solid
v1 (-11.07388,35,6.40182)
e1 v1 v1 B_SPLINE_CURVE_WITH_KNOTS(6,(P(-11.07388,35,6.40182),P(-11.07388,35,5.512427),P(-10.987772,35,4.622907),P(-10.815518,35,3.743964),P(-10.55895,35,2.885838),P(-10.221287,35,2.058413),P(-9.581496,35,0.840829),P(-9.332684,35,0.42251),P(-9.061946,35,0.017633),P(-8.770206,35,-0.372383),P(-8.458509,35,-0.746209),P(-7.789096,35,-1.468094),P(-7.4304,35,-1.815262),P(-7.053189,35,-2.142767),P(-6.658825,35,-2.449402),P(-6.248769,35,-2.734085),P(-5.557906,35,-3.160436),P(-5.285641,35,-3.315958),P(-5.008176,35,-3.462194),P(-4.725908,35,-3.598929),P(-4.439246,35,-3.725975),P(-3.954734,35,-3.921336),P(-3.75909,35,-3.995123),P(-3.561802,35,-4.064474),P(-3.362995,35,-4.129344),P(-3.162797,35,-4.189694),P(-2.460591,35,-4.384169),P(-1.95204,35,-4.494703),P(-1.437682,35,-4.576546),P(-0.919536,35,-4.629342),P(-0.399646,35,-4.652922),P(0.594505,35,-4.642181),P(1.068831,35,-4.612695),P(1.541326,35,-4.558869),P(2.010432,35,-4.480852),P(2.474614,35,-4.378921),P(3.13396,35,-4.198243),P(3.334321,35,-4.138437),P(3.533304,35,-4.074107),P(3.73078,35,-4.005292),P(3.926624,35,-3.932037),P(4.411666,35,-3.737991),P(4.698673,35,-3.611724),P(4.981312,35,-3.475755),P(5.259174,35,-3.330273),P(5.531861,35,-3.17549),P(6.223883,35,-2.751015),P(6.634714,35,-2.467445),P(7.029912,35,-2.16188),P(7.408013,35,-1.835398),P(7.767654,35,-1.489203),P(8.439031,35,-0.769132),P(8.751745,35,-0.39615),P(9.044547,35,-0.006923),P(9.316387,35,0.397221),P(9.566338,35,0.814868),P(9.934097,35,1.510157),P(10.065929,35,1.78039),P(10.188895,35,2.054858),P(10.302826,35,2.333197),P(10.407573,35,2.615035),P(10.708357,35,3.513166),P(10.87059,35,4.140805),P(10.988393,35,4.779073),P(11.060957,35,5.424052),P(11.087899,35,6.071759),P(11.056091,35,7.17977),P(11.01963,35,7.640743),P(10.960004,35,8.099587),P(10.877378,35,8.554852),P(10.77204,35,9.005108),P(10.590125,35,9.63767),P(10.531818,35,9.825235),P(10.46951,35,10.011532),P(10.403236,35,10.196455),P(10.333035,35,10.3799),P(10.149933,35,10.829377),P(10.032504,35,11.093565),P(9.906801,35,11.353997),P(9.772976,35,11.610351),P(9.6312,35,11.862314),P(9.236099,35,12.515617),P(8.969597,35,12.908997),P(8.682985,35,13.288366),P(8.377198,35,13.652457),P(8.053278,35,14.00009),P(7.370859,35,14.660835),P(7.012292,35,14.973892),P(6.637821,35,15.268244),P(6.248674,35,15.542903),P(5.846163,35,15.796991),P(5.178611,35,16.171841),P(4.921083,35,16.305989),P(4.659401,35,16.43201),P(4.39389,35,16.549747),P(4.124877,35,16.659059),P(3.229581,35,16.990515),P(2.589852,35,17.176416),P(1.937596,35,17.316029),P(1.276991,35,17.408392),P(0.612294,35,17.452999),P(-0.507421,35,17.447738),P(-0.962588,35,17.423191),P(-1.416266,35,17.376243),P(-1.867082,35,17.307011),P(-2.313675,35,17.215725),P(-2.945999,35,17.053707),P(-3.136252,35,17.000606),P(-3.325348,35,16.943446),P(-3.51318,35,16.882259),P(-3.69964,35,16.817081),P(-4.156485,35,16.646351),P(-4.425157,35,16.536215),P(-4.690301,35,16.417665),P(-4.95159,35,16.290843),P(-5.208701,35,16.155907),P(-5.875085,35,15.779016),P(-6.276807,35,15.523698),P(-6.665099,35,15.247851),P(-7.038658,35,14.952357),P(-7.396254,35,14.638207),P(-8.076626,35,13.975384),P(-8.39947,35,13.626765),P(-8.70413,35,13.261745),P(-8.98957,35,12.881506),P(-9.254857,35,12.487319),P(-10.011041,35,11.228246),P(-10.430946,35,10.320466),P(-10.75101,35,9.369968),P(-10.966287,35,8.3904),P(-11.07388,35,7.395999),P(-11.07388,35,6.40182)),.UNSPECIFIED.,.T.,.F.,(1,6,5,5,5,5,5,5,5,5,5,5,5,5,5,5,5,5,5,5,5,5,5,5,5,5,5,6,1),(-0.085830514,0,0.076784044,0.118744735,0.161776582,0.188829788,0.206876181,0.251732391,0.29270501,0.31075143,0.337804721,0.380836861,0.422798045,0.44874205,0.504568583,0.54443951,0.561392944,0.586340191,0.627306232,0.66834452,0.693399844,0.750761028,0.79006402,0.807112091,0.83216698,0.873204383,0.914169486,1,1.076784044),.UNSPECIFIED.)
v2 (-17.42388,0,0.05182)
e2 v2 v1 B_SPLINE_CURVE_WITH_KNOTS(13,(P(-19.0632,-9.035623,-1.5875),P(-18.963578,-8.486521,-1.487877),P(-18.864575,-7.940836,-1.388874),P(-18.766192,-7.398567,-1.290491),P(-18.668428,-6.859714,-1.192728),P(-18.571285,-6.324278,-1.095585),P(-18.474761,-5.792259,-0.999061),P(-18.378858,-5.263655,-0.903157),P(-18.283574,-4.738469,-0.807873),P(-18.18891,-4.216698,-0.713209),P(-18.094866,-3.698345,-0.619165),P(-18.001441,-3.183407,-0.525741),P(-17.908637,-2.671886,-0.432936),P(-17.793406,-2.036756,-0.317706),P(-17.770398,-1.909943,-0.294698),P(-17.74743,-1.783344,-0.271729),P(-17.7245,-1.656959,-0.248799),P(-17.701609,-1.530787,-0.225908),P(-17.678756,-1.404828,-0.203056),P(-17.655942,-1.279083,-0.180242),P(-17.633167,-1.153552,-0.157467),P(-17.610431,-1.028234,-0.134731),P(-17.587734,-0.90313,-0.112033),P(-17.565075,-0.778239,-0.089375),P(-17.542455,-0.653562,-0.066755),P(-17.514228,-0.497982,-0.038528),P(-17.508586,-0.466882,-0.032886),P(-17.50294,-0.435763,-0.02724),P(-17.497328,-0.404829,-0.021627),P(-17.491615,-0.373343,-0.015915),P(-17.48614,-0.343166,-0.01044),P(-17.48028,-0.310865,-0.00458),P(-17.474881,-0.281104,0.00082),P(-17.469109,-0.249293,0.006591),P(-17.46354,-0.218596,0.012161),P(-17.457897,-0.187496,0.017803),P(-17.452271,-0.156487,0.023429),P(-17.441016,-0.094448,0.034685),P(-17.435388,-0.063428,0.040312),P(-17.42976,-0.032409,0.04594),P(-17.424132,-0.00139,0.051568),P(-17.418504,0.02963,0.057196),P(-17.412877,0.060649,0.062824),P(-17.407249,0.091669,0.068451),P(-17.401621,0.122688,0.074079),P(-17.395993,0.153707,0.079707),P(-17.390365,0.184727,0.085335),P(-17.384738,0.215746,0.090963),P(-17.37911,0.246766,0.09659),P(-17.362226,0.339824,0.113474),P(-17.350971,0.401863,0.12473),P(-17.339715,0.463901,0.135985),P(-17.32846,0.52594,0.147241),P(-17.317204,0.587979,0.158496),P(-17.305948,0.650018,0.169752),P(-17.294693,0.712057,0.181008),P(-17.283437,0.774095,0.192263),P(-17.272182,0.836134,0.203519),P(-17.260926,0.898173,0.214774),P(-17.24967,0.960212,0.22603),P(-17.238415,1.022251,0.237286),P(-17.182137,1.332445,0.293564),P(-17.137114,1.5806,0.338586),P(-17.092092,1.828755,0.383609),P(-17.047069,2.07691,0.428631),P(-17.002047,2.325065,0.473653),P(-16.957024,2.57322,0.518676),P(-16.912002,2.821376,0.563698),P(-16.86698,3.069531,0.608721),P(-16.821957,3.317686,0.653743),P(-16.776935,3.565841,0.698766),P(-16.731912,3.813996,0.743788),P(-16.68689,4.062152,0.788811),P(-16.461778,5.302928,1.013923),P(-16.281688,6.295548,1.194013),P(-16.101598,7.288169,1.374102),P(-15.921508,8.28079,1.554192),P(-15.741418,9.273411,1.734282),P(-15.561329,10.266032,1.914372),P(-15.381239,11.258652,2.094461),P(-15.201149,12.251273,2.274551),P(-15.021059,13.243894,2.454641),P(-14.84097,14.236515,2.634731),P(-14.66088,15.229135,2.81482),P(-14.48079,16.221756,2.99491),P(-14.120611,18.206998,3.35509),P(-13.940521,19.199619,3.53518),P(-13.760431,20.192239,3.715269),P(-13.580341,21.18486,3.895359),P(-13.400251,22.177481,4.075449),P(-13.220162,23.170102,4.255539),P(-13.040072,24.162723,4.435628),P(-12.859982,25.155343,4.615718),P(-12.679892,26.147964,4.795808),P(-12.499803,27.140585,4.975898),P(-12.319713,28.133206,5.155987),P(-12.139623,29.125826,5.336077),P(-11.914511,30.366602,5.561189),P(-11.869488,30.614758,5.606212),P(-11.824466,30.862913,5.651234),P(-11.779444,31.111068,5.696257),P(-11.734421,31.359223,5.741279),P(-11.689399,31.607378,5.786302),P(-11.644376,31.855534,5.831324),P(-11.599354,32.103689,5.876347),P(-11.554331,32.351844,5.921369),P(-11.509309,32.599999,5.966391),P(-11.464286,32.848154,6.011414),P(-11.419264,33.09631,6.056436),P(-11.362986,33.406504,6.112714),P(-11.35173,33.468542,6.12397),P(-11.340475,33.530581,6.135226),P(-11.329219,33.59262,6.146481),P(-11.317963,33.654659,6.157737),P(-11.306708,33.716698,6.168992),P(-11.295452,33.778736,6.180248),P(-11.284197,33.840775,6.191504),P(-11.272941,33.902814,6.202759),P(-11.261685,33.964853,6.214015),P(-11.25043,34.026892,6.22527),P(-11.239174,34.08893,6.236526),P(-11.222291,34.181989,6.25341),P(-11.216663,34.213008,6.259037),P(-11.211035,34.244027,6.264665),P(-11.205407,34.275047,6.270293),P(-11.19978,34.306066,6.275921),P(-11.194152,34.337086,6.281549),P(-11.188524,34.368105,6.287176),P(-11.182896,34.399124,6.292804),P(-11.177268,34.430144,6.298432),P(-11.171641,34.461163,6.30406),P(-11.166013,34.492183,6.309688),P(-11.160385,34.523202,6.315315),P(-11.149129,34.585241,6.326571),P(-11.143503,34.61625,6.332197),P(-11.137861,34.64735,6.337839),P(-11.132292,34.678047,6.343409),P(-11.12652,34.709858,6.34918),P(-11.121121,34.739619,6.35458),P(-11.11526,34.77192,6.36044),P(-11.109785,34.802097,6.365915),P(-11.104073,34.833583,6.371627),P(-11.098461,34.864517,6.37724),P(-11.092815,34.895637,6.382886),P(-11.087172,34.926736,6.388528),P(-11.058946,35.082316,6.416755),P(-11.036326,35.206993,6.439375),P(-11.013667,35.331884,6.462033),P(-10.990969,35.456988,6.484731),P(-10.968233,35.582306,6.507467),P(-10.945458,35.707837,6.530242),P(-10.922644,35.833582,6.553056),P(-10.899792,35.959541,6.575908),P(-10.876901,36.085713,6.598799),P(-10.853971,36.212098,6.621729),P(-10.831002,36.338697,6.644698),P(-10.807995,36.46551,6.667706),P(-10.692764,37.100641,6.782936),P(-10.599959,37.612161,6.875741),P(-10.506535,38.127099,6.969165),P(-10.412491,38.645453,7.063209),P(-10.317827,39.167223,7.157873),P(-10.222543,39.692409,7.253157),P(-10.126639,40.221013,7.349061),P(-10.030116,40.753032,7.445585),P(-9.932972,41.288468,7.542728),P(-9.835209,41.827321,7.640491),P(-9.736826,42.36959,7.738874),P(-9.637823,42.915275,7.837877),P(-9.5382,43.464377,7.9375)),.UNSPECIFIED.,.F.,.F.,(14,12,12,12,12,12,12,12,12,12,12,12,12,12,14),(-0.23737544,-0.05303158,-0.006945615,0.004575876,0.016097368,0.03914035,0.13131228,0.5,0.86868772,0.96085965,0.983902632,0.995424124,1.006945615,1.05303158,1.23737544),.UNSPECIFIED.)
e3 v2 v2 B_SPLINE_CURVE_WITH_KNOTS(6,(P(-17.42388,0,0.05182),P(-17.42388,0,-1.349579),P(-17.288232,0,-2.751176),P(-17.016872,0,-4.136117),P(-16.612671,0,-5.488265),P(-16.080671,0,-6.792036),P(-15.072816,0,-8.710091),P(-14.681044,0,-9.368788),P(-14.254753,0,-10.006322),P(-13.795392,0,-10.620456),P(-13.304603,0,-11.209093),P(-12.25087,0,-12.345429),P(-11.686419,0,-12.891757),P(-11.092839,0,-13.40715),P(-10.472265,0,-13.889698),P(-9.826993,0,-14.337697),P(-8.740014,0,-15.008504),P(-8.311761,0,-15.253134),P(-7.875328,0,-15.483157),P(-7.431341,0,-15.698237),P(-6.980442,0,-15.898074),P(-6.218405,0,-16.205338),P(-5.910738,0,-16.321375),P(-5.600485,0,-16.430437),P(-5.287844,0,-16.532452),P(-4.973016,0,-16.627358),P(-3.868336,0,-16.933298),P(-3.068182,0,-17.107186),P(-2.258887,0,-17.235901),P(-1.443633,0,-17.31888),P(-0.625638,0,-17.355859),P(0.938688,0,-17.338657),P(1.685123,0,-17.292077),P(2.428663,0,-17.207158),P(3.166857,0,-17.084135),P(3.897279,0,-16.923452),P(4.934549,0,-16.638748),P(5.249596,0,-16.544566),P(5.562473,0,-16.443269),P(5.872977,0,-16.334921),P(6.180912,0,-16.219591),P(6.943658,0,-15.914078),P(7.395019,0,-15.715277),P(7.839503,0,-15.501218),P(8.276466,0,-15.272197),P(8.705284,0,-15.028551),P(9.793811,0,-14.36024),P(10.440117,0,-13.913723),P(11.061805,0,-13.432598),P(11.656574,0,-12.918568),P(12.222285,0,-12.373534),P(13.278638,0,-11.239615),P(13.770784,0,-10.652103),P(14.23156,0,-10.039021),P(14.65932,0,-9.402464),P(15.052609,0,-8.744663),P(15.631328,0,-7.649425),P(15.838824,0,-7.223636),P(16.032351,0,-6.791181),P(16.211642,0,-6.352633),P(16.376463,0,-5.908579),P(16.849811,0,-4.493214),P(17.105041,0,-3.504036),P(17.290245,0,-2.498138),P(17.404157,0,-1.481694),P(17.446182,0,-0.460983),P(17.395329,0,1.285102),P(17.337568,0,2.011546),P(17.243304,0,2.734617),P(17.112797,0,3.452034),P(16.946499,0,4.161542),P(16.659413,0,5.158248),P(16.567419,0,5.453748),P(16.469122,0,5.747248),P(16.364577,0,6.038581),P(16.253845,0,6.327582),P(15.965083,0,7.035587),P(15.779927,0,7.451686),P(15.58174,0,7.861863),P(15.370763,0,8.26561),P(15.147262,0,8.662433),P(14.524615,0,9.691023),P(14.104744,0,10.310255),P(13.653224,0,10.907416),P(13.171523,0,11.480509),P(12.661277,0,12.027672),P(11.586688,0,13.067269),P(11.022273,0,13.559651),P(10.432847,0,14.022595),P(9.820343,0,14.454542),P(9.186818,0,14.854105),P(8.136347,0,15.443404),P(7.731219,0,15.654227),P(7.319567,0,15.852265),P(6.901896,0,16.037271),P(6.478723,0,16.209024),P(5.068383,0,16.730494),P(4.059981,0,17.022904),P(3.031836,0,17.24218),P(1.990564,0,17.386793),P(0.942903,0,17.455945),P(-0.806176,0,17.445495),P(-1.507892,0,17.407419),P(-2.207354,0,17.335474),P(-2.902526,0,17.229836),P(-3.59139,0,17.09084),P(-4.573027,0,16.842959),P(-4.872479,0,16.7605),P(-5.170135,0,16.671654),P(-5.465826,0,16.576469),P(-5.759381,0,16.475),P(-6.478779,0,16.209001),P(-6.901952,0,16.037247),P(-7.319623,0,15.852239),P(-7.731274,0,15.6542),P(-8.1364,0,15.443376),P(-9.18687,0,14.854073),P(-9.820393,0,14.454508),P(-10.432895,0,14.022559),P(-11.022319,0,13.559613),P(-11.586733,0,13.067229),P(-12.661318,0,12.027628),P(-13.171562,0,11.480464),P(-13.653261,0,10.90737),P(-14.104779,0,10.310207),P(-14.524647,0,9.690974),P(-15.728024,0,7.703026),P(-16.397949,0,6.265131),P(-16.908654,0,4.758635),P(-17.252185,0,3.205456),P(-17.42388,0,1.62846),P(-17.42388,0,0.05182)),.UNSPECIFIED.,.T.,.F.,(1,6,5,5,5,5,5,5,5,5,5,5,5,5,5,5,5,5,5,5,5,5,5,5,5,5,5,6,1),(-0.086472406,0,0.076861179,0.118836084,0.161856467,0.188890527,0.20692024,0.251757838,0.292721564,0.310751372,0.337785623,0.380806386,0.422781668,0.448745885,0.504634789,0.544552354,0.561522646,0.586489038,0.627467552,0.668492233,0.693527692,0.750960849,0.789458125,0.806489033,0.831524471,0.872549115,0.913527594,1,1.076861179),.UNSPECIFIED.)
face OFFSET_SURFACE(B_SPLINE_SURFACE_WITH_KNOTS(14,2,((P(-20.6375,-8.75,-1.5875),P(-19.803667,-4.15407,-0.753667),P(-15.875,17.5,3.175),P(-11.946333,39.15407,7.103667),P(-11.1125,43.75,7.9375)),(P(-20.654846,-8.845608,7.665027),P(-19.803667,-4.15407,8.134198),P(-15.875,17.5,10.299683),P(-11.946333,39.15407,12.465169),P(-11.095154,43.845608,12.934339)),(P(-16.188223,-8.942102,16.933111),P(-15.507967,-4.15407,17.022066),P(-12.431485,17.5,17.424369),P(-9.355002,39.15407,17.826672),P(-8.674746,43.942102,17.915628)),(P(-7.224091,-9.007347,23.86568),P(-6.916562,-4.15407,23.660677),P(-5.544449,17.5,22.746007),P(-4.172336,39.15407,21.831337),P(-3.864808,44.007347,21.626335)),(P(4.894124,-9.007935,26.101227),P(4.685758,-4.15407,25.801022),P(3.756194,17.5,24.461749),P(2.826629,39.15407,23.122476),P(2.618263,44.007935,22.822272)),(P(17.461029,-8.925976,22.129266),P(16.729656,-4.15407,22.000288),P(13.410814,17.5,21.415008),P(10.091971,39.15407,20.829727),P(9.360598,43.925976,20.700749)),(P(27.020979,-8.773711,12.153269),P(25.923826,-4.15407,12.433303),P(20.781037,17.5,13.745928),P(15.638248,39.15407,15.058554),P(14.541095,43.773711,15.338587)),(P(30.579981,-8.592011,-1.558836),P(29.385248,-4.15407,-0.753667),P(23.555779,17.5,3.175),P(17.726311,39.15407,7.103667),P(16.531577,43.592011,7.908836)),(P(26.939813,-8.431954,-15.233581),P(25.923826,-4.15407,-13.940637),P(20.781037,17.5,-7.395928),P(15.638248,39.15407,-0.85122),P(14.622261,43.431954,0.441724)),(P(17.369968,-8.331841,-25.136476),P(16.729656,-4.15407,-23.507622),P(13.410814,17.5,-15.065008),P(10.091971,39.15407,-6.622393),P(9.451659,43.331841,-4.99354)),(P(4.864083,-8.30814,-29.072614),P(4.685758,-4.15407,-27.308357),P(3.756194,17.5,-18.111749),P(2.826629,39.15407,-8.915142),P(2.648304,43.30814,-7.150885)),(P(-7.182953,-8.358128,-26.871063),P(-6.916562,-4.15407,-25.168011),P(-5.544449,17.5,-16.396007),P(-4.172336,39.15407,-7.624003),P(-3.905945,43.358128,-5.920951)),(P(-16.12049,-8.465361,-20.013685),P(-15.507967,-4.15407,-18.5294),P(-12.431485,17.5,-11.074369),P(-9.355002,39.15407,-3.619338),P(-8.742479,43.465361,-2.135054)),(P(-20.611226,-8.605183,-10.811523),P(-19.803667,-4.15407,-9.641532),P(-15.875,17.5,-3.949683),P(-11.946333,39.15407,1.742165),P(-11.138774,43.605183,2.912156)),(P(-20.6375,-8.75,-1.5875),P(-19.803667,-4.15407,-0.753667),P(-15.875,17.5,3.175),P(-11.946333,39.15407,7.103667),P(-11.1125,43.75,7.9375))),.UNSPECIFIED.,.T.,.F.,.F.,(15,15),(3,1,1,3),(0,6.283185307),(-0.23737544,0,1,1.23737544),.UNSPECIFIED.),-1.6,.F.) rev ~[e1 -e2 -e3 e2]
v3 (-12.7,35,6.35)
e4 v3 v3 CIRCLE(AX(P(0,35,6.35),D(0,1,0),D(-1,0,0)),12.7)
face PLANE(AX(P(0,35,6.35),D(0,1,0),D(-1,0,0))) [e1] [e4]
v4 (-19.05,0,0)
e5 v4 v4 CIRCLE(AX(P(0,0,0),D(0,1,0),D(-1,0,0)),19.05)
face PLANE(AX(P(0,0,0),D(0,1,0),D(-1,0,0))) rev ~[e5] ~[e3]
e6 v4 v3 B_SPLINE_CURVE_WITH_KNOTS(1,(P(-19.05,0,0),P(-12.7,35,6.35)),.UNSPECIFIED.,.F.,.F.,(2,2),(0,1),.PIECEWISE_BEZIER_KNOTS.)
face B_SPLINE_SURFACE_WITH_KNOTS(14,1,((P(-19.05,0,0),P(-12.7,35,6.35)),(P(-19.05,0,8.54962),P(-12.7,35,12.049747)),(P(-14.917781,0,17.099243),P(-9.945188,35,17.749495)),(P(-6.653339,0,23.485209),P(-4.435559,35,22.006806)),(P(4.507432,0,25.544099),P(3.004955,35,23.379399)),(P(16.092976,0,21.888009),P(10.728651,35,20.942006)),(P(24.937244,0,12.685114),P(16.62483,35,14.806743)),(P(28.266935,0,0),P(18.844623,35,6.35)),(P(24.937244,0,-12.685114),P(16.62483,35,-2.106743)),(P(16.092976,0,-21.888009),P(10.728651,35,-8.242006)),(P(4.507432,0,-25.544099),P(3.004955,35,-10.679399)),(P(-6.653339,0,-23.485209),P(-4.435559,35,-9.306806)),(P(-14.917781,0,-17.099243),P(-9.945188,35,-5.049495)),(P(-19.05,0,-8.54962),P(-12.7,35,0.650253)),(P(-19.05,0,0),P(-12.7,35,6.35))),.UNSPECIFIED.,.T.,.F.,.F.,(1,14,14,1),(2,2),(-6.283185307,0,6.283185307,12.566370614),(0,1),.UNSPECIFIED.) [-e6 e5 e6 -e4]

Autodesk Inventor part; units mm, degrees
ref_plane "YZ Plane" through (0, 0, 0) normal (1, 0, 0) x (0, 1, 0)
ref_plane "XY Plane" through (0, 0, 0) normal (0, 0, 1) x (1, 0, 0)
sketch "Szkic6" plane through (0, 0, 0) normal (0, 1, 0) x (-1, 0, 0)
  circle A0 centre (0, 0) radius 19.05
  dimension "d33" = 38.1
ref_plane "Płaszczyzna konstrukcyjna1" through (0, 35, 0) normal (0, 1, 0) x (-1, 0, 0)
sketch "Szkic7" plane through (0, 35, 0) normal (0, 1, 0) x (-1, 0, 0)
  circle A0 centre (0, 6.35) radius 12.7
  line L0 (0, -20.3) -> (0, 20.3) construction
  circle A1 centre (0, 0) radius 19.05 construction
  dimension "d35" = 25.4
loft "Wyciągnięcie złożone1" add profiles "Szkic6", "Szkic7"
shell "Skorupa1" thickness 1.6 removed faces 2 at (-2.0429, 35, 5.8465) at (5.6226, 0, 0.0883)
equation "\"d33\" = OD1"
equation "\"d35\" = OD2"
equation "\"d52\" = THK"
equation "\"SzerokośćGięciaPodcięcia\" = Grubość"
equation "\"RozmiarPodcięciaNarożnika\" = 4 * Grubość"
equation "\"PromieńPrzejścia\" = PromieńGięcia"
equation "\"Rozmiar_promienia_Jacobiego\" = PromieńGięcia"
equation "\"Wielk_odstępu\" = Grubość"
equation "\"d2\" = PromieńGięcia"
equation "\"d23\" = PromieńGięcia"
equation "\"OD1\" = 38.1"
equation "\"OD2\" = 25.4"
equation "\"L\" = 35"
equation "\"THK\" = 1.6"
equation "\"d34\" = L"
equation "\"Grubość\" = 1.5"
equation "\"PromieńGięcia\" = 3"
properties part number "Redukcja asymetryczna Ø38,1x25,4x1,6 L=35" material "304"
